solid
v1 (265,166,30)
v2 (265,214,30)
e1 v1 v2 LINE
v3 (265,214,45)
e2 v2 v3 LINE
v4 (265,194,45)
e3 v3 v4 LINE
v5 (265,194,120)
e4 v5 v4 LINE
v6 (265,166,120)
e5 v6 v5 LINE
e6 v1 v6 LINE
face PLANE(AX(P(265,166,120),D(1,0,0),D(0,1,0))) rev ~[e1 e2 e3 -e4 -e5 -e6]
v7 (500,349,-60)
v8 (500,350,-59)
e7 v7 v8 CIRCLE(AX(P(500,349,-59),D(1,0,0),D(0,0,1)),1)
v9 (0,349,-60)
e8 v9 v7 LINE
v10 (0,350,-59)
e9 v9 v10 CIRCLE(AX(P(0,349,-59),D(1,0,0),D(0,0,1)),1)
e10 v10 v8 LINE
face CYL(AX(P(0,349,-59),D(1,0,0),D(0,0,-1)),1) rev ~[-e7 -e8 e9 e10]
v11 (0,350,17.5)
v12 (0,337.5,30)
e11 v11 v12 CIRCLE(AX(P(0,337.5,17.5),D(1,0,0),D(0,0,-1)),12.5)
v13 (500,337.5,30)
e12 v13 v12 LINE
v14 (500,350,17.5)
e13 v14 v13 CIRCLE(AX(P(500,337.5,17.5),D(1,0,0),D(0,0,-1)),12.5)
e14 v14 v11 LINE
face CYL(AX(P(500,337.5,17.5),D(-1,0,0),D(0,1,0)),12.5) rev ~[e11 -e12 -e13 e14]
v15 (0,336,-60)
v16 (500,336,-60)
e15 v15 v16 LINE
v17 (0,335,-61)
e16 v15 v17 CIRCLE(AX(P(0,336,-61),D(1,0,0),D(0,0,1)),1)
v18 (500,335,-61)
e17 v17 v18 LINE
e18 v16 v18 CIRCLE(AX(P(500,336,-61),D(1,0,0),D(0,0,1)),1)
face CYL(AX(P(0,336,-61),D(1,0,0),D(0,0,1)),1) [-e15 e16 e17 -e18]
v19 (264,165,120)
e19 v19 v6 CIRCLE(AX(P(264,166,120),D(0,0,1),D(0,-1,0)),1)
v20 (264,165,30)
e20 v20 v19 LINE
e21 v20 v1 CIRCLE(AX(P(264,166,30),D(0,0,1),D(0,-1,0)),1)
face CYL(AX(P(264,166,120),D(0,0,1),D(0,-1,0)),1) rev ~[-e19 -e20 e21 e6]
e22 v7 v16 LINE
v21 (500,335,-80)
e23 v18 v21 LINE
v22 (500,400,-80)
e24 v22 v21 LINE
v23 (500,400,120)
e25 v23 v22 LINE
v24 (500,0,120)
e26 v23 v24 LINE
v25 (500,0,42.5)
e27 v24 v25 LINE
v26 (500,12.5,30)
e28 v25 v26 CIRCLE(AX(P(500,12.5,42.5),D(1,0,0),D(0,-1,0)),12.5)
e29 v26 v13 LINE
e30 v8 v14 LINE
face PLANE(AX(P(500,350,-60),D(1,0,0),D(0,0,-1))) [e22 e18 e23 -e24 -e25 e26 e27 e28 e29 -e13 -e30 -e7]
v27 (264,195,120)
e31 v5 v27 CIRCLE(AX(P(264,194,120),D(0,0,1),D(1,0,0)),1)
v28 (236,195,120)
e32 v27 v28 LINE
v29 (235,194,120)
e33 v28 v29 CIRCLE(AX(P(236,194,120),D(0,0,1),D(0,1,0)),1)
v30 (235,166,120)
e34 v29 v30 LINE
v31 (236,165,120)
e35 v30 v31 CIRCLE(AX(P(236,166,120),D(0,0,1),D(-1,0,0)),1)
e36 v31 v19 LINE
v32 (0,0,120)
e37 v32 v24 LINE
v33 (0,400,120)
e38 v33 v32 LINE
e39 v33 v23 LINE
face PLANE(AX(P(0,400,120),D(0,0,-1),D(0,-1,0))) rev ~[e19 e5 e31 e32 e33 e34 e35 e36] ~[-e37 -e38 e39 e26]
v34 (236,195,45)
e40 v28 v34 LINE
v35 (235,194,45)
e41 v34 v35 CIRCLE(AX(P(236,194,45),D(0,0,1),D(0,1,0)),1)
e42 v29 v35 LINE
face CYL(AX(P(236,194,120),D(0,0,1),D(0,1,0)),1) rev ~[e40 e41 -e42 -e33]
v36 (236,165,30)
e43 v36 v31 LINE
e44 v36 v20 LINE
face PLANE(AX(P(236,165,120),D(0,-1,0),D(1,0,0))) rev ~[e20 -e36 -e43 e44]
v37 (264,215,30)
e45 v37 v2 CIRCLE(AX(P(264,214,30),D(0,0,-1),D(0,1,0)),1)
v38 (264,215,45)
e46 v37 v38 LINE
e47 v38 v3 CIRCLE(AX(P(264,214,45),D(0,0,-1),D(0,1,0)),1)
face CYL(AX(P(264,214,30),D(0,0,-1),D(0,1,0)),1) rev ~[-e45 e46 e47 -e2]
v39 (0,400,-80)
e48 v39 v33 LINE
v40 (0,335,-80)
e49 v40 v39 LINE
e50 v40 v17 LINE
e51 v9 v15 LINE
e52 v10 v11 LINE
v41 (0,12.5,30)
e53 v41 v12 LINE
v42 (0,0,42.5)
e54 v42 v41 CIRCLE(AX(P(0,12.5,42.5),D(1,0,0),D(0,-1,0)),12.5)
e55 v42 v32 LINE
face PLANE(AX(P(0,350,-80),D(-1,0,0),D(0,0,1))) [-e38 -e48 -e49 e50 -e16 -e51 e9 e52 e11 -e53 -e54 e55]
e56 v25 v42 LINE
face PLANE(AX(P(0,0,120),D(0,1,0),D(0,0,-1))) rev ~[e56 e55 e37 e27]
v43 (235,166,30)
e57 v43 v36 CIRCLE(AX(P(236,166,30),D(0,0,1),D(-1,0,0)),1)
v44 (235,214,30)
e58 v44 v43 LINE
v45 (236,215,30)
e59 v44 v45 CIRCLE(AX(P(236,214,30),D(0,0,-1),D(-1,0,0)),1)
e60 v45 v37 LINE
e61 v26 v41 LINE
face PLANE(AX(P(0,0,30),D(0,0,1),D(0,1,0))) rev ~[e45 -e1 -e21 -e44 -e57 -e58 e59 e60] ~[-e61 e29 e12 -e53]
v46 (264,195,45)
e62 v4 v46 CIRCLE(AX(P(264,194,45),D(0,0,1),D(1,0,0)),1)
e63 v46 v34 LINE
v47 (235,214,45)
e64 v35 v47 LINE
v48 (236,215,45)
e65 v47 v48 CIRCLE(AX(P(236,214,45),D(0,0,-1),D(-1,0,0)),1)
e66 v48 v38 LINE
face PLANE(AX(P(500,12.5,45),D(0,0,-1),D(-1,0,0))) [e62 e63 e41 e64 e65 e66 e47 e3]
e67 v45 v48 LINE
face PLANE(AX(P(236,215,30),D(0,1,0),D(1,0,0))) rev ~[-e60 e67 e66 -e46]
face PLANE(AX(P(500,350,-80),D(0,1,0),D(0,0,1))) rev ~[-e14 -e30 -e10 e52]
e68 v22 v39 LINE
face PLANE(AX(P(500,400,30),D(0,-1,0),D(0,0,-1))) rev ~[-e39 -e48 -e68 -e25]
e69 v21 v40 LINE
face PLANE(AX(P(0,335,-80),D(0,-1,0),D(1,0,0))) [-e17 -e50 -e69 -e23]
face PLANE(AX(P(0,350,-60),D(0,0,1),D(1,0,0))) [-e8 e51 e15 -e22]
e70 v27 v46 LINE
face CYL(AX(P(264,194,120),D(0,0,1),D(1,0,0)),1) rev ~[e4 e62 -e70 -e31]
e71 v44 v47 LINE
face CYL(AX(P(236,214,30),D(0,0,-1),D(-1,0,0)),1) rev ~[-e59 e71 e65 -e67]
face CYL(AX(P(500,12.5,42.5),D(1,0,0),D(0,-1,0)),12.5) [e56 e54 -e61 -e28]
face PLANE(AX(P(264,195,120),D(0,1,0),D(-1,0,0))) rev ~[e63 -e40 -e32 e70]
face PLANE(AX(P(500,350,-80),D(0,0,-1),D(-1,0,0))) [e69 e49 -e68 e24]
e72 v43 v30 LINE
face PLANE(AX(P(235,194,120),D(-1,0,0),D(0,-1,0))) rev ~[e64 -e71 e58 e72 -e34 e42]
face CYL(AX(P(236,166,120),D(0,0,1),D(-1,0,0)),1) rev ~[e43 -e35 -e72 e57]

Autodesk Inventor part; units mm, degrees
ref_plane "YZ Plane" through (0, 0, 0) normal (1, 0, 0) x (0, 1, 0)
ref_plane "XZ Plane" through (0, 0, 0) normal (0, 1, 0) x (-1, 0, 0)
ref_plane "XY Plane" through (0, 0, 0) normal (0, 0, 1) x (1, 0, 0)
sketch "Sketch1" plane through (0, 0, 0) normal (1, 0, 0) x (0, 1, 0)
  line L0 (400, 120) -> (0, 120)
  line L1 (0, 40) -> (0, 62.8571)
  line L2 (400, 120) -> (0, 120)
  line L3 (0, 120) -> (0, 30)
  line L4 (0, 30) -> (400, 30)
  line L5 (400, 30) -> (400, 120)
  dimension "d54" = 400
  dimension "d55" = 90
extrude "Extrusion1" add sketch "Sketch1" along normal blind 500
sketch "Sketch2" plane through (500, 0, 0) normal (1, 0, 0) x (0, 0, -1)
  line L0 (-30, 400) -> (80, 400)
  line L1 (80, 400) -> (80, 350)
  line L2 (80, 350) -> (-30, 350)
  line L3 (-30, 350) -> (-30, 400)
  arc A0 (-42.5, 0) -> (-30, 12.5) centre (-42.5, 12.5) ccw
  line L4 (-120, 0) -> (-30, 0) projected
  line L5 (-30, 0) -> (-64.3382, 0)
  line L6 (-30, 12.5) -> (-30, 0)
  line L7 (-120, 400) -> (-120, 0) projected
  line L8 (-120, 0) -> (-70, 0)
  line L9 (-70, 0) -> (-70, 50)
  line L10 (-70, 50) -> (-120, 50)
  line L11 (-120, 50) -> (-120, 0)
  point P0 (-70, 0)
  dimension "d11" = 110
  dimension "d12" = 50
  dimension "d33" = 12.5
  dimension "d38" = 50
  dimension "d39" = 50
extrude "Extrusion11" cut sketch "Sketch2" against normal blind 500 contours A0 L6 L4
extrude "Extrusion12" add sketch "Sketch2" against normal blind 500 contours L0 L1 L2 L3
sketch "Sketch8" plane through (0, 0, 120) normal (0, 0, 1) x (1, 0, 0)
  line L0 (0, 0) -> (500, 0) projected
  line L1 (0, 400) -> (500, 400) projected
  line L2 (0, 0) -> (500, 0)
  line L3 (500, 0) -> (500, 400)
  line L4 (500, 400) -> (0, 400)
  line L5 (0, 400) -> (0, 0)
  line L6 (264, 195) -> (236, 195)
  line L7 (235, 194) -> (235, 166)
  line L8 (236, 165) -> (264, 165)
  line L9 (265, 166) -> (265, 194)
  arc A0 (236, 195) -> (235, 194) centre (236, 194) ccw
  arc A1 (265, 194) -> (264, 195) centre (264, 194) ccw
  arc A2 (264, 165) -> (265, 166) centre (264, 166) ccw
  arc A3 (235, 166) -> (236, 165) centre (236, 166) ccw
  point P0 (265, 195)
  point P1 (235, 165)
  point P2 (235, 195)
  point P3 (265, 165)
  dimension "d77" = 30
  dimension "d78" = 30
  dimension "d83" = 1
extrude "Extrusion17" cut sketch "Sketch8" against normal blind 90 contours A1 L9 A2 L8 A3 L7 A0 L6
sketch "Sketch10" plane through (500, 12.5, 30) normal (0, 0, -1) x (-1, 0, 0)
  line L0 (236, 152.5) -> (264, 152.5)
  line L1 (265, 153.5) -> (265, 201.5)
  line L2 (264, 202.5) -> (236, 202.5)
  line L3 (235, 201.5) -> (235, 153.5)
  arc A0 (236, 202.5) -> (235, 201.5) centre (236, 201.5) ccw
  arc A1 (265, 201.5) -> (264, 202.5) centre (264, 201.5) ccw
  arc A2 (264, 152.5) -> (265, 153.5) centre (264, 153.5) ccw
  arc A3 (235, 153.5) -> (236, 152.5) centre (236, 153.5) ccw
  point P0 (500, -12.5)
  point P1 (265, 202.5)
  point P2 (265, 152.5)
  point P3 (235, 202.5)
  dimension "d84" = 30
  dimension "d85" = 50
  dimension "d86" = 1
extrude "Extrusion18" cut sketch "Sketch10" against normal blind 15
fillet "Face Fillet1" radius 12.5 1 edges at (250, 350, 30)
sketch "Sketch11" plane through (0, 350, -80) normal (0, -1, 0) x (1, 0, 0)
  line L0 (500, 0) -> (0, 0) projected
  line L1 (500, 0) -> (0, 0)
  line L2 (0, 0) -> (0, 20)
  line L3 (0, 20) -> (500, 20)
  line L4 (500, 20) -> (500, 0)
  dimension "d92" = 500
  dimension "d93" = 20
extrude "Extrusion19" add sketch "Sketch11" along normal blind 15
fillet "Face Fillet2" radius 1 1 edges at (250, 350, -60)
fillet "Face Fillet3" radius 1 1 edges at (250, 335, -60)
properties part number "Molde" material "Aluminum 6061-AHC"
